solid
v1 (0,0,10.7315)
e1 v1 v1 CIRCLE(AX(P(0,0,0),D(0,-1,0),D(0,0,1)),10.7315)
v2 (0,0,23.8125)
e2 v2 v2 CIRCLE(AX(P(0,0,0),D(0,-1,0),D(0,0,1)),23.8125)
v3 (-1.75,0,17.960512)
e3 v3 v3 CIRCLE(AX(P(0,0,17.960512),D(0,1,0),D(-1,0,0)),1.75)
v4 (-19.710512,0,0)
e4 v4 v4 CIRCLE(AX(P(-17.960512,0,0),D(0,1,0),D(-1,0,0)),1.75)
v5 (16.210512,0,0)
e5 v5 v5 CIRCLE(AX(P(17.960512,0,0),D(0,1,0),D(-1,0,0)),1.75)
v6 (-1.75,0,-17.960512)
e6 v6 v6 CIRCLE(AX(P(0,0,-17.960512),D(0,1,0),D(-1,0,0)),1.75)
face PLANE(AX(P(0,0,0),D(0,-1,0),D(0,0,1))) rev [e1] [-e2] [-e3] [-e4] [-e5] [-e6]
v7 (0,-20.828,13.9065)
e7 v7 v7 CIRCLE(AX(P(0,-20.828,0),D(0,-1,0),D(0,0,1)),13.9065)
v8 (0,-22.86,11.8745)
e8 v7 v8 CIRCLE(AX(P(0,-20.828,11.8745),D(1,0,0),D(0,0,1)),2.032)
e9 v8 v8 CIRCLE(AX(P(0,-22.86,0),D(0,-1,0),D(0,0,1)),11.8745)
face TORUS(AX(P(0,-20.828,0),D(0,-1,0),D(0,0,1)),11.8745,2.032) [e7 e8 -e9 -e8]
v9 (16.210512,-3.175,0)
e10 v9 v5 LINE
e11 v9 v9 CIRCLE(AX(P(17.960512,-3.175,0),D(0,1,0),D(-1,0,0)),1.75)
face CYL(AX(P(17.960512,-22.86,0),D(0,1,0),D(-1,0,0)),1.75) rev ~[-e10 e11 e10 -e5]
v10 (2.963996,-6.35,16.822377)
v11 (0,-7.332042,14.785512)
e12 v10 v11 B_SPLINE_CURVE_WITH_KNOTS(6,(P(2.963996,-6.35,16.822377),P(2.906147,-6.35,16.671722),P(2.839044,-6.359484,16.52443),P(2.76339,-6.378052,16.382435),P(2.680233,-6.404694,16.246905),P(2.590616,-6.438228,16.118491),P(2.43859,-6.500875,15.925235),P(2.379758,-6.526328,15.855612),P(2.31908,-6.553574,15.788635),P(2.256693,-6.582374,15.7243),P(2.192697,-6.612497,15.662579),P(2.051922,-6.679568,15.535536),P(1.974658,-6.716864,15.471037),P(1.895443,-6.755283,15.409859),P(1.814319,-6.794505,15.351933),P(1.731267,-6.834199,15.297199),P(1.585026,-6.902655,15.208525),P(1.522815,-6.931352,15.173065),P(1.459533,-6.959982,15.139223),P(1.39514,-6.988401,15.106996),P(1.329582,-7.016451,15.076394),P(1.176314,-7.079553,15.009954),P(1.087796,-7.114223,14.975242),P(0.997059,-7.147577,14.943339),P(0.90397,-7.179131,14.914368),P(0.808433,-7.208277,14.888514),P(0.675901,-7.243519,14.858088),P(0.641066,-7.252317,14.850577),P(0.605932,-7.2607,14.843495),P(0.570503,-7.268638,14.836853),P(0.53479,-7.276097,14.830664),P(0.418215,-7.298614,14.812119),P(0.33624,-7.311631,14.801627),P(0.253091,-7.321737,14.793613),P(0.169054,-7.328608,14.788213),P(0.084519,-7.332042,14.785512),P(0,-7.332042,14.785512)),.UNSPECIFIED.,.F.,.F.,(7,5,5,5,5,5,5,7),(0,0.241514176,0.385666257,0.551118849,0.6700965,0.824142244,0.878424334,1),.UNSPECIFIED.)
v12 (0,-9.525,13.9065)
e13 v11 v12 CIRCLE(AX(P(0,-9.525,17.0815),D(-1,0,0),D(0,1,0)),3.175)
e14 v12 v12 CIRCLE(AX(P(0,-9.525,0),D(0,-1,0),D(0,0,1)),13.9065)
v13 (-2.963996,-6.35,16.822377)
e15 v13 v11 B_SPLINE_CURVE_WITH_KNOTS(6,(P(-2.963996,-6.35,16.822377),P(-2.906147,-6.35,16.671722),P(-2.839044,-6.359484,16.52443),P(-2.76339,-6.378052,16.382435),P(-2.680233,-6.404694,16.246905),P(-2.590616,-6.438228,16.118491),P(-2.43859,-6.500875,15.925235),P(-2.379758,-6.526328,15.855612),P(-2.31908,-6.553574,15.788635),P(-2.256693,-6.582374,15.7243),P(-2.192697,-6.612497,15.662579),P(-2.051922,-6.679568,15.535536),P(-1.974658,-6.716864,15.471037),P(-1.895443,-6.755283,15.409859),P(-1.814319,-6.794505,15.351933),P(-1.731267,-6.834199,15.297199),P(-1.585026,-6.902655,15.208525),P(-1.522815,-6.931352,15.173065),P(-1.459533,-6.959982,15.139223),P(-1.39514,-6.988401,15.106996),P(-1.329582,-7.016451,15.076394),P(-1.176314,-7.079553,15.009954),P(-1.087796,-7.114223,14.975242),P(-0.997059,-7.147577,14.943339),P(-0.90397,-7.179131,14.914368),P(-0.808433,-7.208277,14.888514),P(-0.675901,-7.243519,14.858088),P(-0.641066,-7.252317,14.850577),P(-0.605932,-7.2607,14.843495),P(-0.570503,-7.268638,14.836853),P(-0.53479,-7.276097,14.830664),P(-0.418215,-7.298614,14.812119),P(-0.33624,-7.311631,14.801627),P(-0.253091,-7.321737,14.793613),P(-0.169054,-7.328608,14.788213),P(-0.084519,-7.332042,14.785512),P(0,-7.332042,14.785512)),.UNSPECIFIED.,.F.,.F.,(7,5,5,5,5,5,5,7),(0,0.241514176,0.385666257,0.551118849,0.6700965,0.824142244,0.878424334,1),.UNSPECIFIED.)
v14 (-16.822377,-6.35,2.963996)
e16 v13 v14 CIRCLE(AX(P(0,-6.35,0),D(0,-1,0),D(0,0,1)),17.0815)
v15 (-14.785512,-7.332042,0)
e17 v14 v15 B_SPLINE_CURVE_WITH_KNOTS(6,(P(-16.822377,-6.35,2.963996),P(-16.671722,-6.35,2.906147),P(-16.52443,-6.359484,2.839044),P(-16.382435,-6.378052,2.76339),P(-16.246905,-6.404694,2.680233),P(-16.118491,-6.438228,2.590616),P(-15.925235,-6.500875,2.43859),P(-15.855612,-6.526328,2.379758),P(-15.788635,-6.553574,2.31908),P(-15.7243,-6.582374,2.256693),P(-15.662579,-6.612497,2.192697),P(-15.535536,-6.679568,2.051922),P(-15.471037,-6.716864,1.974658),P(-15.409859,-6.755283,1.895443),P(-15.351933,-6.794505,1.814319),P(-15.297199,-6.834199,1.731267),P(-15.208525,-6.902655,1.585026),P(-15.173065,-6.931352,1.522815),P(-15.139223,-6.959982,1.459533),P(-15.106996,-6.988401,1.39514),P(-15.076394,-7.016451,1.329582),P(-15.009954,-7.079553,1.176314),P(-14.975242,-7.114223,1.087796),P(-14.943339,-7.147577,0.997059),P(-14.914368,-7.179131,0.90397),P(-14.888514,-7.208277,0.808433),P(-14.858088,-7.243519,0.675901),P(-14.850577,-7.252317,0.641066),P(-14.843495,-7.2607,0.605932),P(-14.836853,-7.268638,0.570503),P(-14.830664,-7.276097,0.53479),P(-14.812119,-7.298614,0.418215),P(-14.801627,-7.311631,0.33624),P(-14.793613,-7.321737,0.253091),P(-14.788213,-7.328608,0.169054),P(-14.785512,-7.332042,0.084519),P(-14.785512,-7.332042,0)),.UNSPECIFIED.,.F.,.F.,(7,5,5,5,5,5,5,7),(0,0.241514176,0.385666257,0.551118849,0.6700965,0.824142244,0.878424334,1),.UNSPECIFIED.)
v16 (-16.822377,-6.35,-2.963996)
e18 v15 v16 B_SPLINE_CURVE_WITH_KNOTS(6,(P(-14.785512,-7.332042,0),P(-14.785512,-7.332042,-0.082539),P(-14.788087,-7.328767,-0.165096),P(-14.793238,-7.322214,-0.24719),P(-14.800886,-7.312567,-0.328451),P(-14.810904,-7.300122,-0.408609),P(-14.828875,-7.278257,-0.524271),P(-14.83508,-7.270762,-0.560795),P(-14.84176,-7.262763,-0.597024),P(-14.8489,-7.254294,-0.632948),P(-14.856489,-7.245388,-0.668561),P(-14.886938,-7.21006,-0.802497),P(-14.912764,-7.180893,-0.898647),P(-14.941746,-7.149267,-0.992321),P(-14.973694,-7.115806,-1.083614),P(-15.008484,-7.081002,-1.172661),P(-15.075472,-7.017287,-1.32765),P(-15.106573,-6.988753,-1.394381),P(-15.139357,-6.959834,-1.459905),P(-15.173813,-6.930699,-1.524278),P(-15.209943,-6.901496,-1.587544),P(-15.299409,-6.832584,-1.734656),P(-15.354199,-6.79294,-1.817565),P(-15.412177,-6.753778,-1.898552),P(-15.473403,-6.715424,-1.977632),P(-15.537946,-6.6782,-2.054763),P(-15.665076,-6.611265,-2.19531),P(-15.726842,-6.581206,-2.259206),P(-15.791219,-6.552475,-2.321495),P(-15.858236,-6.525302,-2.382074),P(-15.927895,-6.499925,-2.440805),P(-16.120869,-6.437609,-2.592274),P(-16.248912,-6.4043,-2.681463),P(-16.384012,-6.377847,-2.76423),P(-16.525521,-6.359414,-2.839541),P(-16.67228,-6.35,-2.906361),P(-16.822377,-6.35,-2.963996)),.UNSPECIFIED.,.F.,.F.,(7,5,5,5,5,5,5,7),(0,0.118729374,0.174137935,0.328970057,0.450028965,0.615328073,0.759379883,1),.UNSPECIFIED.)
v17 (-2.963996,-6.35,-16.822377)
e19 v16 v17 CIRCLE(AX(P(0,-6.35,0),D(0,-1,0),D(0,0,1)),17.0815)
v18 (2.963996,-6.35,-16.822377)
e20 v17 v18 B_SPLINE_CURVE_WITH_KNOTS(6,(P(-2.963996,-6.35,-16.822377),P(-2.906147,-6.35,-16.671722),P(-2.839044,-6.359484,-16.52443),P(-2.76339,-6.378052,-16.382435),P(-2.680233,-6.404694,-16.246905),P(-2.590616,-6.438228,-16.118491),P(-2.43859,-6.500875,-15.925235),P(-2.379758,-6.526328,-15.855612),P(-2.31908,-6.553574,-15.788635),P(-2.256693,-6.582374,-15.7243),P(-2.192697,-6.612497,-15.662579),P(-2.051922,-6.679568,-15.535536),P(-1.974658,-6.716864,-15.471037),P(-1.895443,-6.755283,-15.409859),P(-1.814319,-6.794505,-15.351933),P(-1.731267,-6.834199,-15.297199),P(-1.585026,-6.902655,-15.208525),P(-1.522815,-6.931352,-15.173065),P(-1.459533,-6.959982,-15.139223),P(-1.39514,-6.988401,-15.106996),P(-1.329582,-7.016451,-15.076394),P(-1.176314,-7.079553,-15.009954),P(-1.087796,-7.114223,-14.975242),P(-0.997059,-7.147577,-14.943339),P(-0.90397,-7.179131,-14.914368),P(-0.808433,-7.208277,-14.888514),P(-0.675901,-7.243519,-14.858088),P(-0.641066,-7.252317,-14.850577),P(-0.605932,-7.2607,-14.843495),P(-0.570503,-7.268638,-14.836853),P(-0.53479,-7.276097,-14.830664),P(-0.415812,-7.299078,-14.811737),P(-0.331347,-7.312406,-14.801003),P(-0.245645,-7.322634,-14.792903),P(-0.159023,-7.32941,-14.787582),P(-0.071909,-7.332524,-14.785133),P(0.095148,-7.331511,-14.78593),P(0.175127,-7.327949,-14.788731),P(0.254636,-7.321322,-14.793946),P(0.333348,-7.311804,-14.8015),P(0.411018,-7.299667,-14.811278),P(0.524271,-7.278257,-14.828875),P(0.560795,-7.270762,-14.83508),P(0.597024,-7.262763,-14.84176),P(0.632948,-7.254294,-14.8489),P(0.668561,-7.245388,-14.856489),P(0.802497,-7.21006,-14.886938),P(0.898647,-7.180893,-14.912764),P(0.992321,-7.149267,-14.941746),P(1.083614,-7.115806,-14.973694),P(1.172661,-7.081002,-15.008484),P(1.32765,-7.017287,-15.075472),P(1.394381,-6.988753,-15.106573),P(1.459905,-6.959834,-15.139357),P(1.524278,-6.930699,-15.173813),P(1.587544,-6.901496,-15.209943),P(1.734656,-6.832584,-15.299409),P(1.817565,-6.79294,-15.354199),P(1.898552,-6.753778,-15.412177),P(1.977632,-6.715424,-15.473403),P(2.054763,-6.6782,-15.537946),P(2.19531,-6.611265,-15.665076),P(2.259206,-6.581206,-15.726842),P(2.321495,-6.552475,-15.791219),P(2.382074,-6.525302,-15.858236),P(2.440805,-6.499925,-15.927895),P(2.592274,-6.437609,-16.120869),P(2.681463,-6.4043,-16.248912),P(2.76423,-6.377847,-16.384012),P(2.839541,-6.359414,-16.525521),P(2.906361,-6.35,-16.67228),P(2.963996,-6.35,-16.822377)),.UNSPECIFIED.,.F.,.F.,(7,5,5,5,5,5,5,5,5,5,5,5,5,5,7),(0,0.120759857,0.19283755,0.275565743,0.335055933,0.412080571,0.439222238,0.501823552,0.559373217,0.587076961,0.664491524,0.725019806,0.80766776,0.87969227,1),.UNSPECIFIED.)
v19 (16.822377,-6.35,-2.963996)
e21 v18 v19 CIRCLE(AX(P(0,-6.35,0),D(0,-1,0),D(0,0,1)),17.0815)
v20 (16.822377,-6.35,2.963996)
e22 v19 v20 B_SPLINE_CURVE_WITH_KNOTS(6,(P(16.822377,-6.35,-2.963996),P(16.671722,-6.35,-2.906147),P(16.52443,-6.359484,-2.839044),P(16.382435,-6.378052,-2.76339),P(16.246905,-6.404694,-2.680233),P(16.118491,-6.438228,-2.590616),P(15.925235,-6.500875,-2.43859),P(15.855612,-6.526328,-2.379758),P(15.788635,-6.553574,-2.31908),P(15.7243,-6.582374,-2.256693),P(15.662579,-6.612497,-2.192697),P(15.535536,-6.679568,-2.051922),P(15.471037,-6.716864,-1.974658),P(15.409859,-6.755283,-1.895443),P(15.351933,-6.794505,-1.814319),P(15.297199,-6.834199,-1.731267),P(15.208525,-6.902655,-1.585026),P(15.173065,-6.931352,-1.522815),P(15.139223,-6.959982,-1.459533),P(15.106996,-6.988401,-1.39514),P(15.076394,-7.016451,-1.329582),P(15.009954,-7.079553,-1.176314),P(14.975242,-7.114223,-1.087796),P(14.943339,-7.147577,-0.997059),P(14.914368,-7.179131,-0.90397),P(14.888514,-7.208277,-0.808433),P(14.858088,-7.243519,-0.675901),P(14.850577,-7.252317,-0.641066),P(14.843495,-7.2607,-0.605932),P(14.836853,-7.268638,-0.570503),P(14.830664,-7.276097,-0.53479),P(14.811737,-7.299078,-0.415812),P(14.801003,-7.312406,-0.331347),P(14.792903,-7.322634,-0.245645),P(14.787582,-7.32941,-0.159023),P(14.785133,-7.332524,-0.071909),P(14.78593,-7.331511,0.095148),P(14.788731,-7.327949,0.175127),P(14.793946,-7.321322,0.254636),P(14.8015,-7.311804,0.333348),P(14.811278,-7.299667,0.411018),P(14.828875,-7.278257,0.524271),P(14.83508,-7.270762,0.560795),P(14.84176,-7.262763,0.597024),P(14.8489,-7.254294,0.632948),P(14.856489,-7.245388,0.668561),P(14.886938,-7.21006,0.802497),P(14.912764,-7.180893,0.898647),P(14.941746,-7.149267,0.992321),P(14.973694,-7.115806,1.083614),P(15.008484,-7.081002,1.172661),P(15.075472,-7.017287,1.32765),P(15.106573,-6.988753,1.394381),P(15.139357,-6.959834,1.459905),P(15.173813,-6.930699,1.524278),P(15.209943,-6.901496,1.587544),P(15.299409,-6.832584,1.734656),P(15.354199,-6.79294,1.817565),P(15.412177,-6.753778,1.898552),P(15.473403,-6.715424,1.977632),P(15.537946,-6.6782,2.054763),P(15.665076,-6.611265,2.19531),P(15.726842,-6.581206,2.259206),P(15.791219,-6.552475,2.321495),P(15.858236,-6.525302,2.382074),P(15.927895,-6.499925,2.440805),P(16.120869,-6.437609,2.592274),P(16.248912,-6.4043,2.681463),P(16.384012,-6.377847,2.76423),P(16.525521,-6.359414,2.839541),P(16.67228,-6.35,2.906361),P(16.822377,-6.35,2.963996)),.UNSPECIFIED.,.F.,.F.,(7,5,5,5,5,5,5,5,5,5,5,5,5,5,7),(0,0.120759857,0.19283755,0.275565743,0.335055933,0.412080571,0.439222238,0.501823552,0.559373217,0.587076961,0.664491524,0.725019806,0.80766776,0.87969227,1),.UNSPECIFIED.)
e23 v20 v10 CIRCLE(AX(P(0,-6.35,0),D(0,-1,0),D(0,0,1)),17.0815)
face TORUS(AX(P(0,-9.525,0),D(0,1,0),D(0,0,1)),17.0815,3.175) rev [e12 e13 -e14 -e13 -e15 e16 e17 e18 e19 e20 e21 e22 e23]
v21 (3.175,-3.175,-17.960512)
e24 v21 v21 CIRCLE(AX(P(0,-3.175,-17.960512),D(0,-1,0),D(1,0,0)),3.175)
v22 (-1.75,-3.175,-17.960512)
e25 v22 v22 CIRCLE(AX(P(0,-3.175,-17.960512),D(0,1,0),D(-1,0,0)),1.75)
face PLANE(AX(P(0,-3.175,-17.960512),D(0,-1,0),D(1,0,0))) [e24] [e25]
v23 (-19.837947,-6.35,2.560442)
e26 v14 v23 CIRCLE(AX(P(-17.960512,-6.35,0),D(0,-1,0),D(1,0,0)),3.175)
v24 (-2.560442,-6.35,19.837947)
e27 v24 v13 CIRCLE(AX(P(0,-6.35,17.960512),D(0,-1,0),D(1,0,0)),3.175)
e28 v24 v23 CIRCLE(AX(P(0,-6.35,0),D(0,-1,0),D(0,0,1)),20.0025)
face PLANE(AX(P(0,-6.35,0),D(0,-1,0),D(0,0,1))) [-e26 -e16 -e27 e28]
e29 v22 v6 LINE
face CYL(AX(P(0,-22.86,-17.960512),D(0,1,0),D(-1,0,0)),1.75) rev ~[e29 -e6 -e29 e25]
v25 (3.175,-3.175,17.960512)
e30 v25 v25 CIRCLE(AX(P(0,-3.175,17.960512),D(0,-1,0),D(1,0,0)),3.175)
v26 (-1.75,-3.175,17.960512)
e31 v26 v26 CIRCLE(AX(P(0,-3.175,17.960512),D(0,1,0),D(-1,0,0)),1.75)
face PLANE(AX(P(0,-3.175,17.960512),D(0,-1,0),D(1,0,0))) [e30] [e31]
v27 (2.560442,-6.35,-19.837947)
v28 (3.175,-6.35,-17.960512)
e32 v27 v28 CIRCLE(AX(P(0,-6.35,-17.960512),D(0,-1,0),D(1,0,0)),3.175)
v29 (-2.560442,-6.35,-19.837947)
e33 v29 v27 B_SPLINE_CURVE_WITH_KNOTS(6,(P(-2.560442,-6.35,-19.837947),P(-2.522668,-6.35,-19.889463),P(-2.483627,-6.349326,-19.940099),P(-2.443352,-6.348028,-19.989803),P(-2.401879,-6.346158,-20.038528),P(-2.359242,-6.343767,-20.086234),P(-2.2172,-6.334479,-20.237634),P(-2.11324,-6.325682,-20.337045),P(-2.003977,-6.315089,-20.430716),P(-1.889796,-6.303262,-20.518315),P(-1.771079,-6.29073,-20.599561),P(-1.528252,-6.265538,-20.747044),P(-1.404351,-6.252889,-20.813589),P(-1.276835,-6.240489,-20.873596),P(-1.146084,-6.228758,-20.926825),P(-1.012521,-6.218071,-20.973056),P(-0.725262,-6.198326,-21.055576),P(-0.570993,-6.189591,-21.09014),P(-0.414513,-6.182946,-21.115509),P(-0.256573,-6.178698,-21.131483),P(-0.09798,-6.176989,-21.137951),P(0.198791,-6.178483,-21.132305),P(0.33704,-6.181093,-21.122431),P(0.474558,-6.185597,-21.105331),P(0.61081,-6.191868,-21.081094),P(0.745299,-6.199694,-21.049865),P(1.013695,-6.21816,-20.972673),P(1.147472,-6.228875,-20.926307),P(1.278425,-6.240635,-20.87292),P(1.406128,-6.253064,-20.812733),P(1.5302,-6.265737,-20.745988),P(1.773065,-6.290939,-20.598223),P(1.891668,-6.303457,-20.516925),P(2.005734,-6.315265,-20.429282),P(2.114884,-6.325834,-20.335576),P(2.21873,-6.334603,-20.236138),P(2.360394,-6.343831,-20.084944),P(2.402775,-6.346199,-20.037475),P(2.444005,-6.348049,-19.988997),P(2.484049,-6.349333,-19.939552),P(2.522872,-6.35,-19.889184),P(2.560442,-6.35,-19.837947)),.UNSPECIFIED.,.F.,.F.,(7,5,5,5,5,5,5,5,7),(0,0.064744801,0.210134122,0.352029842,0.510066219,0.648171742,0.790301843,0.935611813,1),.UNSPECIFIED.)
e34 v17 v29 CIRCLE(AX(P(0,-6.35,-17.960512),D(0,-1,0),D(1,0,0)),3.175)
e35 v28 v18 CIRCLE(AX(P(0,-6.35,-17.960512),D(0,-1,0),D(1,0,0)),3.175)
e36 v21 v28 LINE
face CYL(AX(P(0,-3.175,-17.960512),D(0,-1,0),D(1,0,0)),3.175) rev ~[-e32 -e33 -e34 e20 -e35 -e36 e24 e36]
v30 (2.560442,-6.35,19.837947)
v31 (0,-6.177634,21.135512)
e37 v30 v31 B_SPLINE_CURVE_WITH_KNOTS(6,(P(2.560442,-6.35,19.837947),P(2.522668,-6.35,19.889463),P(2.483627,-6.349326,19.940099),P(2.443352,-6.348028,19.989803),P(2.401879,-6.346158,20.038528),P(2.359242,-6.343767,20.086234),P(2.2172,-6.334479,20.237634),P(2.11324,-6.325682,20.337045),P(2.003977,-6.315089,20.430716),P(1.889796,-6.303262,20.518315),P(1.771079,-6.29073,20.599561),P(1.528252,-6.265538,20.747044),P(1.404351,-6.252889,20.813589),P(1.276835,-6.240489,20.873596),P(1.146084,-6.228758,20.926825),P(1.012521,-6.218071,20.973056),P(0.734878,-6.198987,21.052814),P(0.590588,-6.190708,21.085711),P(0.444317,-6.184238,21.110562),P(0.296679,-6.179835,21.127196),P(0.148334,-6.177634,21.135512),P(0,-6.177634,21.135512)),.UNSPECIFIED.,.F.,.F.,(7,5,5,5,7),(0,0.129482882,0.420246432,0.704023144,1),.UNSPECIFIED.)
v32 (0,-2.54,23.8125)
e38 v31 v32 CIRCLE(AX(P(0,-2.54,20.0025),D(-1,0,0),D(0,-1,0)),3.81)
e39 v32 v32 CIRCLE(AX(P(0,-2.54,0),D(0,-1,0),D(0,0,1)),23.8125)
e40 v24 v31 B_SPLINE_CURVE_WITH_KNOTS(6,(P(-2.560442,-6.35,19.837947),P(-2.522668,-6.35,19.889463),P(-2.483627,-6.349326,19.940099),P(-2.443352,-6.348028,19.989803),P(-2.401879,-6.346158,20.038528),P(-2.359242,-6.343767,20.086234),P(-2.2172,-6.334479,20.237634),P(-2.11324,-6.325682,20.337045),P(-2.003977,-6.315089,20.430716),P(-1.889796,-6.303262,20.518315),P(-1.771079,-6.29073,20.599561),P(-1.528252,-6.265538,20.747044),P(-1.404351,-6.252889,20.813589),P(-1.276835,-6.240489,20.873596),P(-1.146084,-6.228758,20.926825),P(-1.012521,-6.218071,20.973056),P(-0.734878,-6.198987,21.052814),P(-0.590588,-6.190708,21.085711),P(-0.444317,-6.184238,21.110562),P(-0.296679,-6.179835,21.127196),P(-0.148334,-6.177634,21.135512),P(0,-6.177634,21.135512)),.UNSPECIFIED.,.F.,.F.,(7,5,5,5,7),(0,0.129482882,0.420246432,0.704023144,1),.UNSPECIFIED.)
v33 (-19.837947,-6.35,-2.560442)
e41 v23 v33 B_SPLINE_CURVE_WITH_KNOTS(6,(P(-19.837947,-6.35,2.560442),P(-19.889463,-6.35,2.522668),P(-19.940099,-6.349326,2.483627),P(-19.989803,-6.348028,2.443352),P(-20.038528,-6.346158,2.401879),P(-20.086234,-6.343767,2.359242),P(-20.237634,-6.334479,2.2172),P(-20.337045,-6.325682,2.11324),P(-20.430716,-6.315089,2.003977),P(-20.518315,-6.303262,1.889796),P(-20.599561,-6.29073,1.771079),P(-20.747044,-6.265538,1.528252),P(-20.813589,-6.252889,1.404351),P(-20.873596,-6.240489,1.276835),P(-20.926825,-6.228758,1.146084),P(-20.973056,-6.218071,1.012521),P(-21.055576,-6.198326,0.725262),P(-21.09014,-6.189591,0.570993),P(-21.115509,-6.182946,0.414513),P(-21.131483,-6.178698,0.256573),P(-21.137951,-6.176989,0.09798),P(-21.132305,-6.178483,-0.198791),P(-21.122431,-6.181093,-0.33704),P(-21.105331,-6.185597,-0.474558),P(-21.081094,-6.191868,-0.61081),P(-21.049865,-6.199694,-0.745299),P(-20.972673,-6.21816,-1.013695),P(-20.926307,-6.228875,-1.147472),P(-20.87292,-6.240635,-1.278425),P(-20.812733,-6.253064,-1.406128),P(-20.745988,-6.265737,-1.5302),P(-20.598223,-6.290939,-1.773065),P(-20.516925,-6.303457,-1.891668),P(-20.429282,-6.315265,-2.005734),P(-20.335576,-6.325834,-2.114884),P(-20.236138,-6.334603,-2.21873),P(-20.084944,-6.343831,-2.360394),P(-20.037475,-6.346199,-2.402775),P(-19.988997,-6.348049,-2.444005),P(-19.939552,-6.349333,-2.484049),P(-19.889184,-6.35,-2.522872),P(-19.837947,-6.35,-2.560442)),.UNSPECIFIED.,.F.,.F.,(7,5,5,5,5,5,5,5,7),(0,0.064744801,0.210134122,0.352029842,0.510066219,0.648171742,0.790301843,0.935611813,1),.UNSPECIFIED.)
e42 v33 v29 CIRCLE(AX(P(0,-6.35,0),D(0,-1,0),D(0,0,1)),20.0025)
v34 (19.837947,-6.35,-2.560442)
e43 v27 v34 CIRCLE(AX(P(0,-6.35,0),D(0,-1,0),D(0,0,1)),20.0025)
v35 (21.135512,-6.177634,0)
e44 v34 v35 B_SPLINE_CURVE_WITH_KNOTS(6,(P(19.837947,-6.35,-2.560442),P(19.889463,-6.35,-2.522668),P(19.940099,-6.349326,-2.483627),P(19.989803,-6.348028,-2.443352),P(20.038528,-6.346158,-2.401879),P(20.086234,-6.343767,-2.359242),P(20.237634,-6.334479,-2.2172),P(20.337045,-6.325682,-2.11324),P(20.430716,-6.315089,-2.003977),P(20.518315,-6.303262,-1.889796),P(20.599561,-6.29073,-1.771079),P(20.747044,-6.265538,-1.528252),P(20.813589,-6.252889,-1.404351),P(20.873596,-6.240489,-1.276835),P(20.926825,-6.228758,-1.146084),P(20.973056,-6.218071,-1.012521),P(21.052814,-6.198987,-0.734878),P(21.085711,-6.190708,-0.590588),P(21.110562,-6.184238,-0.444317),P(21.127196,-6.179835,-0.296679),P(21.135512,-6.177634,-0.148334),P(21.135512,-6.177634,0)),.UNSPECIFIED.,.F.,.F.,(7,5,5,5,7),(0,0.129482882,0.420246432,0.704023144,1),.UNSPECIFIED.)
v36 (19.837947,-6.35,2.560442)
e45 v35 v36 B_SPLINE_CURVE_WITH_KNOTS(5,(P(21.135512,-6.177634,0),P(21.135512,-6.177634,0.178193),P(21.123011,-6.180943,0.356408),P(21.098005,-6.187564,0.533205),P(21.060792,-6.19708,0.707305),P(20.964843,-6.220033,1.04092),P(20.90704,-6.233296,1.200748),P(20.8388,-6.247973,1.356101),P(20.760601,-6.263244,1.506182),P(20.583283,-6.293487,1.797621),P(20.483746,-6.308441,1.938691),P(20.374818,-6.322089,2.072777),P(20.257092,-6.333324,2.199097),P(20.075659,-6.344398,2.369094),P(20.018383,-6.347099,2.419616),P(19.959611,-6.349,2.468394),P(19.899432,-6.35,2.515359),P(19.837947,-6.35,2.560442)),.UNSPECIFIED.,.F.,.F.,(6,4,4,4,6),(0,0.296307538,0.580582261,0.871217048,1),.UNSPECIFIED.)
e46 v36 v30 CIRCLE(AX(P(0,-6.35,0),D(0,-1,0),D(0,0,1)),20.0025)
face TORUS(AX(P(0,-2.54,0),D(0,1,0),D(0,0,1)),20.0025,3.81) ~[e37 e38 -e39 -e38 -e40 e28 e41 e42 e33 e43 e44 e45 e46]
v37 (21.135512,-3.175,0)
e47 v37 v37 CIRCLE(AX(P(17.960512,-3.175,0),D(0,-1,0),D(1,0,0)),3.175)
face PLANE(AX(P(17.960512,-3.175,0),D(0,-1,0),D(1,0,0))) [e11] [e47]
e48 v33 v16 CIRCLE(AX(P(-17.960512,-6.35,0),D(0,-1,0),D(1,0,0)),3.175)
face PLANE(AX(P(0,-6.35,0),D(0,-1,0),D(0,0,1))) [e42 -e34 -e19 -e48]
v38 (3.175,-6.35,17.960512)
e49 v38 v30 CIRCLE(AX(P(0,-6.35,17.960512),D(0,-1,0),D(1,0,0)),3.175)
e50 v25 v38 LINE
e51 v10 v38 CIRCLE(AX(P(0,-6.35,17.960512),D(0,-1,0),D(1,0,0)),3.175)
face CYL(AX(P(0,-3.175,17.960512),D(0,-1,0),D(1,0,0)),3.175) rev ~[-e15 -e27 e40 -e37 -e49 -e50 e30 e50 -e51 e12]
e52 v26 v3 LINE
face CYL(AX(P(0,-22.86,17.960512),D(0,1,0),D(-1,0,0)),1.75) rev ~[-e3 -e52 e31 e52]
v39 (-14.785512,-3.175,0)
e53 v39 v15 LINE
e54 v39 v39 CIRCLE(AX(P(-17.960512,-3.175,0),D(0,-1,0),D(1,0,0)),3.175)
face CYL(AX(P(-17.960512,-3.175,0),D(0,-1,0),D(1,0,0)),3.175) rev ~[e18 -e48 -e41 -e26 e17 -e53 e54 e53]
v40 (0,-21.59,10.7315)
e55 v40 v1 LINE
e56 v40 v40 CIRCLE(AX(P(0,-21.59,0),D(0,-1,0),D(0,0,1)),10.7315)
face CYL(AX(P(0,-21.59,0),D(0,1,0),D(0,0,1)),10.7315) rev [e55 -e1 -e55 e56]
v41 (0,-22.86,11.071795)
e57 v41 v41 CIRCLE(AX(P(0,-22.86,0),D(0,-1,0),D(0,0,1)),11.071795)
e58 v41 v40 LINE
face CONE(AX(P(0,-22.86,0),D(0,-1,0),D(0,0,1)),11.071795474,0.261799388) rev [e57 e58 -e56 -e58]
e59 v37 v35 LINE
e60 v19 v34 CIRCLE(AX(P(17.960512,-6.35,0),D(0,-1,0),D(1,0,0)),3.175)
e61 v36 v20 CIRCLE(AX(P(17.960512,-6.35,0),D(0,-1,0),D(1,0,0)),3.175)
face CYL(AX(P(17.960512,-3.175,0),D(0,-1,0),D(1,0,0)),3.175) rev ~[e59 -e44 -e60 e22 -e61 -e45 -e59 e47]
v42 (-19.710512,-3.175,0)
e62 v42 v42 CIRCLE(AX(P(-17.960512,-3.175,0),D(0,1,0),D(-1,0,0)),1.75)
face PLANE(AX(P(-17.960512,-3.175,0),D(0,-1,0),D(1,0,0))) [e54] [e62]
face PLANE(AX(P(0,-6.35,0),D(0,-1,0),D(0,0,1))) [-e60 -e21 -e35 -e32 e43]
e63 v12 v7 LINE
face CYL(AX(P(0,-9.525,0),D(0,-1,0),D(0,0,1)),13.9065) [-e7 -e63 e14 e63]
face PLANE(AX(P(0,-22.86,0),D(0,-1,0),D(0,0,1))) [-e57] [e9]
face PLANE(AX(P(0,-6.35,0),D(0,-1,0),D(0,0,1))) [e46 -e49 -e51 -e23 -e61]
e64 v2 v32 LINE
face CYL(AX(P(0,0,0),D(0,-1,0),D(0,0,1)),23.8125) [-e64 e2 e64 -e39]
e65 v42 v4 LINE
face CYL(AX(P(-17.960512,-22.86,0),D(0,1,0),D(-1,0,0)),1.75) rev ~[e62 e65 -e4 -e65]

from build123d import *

# Parameters (mm, degrees)
F2_R           = 2.032
F4_D           = 3.5
F4_CBORE_D     = 6.35
F4_CBORE_DEPTH = 19.685


# Not quite as in the source:
# - a fillet or chamfer that OpenCascade refuses, or shapes differently, is made with other operations: its cross-section is extruded or revolved along the edge and cut away or added


with BuildPart() as f1:
    # F0 (on Right) → F1 (revolve)
    with BuildSketch(Plane.YZ):
        with BuildLine():
            Line((-22.86, 11.0717954744), (-21.59, 10.7315))
            Line((-21.59, 10.7315), (0, 10.7315))
            Line((0, 10.7315), (0, 23.8125))
            Line((0, 23.8125), (-6.35, 23.8125))
            Line((-6.35, 23.8125), (-6.35, 17.0815))
            ThreePointArc((-6.35, 17.0815), (-7.2799359697, 14.8364359697), (-9.525, 13.9065))
            Line((-9.525, 13.9065), (-22.86, 13.9065))
            Line((-22.86, 13.9065), (-22.86, 11.0717954744))
        make_face()
    revolve(axis=Axis((0, -11.43, 0), (0, -1, 0)))

    # F2
    f2_edges = [f1.edges().sort_by_distance(p)[0] for p in [
        (0, -22.86, -13.9065),
    ]]
    fillet(f2_edges, radius=F2_R)

    # F4 (through all)
    with Locations(Plane.XZ.offset(22.86)):
        with Locations((-17.9605122421, 0), (0, 17.9605122421), (17.9605122421, 0), (0, -17.9605122421)):
            CounterBoreHole(F4_D / 2, F4_CBORE_D / 2, F4_CBORE_DEPTH)

    # F5: fillet of radius 3.81 on 1 edges, made by hand

    # F5_s1 → F5_t2 (revolve, cut)
    with BuildSketch(Plane.YZ):
        with BuildLine():
            ThreePointArc((-6.35, 20.0025), (-5.2340768363, 22.6965768363), (-2.54, 23.8125))
            Line((-2.54, 23.8125), (-6.35, 23.8125))
            Line((-6.35, 23.8125), (-6.35, 20.0025))
        make_face()
    revolve(axis=Axis((0, -6.35, 0), (0, -1, 0)), mode=Mode.SUBTRACT)


solid = f1.part
